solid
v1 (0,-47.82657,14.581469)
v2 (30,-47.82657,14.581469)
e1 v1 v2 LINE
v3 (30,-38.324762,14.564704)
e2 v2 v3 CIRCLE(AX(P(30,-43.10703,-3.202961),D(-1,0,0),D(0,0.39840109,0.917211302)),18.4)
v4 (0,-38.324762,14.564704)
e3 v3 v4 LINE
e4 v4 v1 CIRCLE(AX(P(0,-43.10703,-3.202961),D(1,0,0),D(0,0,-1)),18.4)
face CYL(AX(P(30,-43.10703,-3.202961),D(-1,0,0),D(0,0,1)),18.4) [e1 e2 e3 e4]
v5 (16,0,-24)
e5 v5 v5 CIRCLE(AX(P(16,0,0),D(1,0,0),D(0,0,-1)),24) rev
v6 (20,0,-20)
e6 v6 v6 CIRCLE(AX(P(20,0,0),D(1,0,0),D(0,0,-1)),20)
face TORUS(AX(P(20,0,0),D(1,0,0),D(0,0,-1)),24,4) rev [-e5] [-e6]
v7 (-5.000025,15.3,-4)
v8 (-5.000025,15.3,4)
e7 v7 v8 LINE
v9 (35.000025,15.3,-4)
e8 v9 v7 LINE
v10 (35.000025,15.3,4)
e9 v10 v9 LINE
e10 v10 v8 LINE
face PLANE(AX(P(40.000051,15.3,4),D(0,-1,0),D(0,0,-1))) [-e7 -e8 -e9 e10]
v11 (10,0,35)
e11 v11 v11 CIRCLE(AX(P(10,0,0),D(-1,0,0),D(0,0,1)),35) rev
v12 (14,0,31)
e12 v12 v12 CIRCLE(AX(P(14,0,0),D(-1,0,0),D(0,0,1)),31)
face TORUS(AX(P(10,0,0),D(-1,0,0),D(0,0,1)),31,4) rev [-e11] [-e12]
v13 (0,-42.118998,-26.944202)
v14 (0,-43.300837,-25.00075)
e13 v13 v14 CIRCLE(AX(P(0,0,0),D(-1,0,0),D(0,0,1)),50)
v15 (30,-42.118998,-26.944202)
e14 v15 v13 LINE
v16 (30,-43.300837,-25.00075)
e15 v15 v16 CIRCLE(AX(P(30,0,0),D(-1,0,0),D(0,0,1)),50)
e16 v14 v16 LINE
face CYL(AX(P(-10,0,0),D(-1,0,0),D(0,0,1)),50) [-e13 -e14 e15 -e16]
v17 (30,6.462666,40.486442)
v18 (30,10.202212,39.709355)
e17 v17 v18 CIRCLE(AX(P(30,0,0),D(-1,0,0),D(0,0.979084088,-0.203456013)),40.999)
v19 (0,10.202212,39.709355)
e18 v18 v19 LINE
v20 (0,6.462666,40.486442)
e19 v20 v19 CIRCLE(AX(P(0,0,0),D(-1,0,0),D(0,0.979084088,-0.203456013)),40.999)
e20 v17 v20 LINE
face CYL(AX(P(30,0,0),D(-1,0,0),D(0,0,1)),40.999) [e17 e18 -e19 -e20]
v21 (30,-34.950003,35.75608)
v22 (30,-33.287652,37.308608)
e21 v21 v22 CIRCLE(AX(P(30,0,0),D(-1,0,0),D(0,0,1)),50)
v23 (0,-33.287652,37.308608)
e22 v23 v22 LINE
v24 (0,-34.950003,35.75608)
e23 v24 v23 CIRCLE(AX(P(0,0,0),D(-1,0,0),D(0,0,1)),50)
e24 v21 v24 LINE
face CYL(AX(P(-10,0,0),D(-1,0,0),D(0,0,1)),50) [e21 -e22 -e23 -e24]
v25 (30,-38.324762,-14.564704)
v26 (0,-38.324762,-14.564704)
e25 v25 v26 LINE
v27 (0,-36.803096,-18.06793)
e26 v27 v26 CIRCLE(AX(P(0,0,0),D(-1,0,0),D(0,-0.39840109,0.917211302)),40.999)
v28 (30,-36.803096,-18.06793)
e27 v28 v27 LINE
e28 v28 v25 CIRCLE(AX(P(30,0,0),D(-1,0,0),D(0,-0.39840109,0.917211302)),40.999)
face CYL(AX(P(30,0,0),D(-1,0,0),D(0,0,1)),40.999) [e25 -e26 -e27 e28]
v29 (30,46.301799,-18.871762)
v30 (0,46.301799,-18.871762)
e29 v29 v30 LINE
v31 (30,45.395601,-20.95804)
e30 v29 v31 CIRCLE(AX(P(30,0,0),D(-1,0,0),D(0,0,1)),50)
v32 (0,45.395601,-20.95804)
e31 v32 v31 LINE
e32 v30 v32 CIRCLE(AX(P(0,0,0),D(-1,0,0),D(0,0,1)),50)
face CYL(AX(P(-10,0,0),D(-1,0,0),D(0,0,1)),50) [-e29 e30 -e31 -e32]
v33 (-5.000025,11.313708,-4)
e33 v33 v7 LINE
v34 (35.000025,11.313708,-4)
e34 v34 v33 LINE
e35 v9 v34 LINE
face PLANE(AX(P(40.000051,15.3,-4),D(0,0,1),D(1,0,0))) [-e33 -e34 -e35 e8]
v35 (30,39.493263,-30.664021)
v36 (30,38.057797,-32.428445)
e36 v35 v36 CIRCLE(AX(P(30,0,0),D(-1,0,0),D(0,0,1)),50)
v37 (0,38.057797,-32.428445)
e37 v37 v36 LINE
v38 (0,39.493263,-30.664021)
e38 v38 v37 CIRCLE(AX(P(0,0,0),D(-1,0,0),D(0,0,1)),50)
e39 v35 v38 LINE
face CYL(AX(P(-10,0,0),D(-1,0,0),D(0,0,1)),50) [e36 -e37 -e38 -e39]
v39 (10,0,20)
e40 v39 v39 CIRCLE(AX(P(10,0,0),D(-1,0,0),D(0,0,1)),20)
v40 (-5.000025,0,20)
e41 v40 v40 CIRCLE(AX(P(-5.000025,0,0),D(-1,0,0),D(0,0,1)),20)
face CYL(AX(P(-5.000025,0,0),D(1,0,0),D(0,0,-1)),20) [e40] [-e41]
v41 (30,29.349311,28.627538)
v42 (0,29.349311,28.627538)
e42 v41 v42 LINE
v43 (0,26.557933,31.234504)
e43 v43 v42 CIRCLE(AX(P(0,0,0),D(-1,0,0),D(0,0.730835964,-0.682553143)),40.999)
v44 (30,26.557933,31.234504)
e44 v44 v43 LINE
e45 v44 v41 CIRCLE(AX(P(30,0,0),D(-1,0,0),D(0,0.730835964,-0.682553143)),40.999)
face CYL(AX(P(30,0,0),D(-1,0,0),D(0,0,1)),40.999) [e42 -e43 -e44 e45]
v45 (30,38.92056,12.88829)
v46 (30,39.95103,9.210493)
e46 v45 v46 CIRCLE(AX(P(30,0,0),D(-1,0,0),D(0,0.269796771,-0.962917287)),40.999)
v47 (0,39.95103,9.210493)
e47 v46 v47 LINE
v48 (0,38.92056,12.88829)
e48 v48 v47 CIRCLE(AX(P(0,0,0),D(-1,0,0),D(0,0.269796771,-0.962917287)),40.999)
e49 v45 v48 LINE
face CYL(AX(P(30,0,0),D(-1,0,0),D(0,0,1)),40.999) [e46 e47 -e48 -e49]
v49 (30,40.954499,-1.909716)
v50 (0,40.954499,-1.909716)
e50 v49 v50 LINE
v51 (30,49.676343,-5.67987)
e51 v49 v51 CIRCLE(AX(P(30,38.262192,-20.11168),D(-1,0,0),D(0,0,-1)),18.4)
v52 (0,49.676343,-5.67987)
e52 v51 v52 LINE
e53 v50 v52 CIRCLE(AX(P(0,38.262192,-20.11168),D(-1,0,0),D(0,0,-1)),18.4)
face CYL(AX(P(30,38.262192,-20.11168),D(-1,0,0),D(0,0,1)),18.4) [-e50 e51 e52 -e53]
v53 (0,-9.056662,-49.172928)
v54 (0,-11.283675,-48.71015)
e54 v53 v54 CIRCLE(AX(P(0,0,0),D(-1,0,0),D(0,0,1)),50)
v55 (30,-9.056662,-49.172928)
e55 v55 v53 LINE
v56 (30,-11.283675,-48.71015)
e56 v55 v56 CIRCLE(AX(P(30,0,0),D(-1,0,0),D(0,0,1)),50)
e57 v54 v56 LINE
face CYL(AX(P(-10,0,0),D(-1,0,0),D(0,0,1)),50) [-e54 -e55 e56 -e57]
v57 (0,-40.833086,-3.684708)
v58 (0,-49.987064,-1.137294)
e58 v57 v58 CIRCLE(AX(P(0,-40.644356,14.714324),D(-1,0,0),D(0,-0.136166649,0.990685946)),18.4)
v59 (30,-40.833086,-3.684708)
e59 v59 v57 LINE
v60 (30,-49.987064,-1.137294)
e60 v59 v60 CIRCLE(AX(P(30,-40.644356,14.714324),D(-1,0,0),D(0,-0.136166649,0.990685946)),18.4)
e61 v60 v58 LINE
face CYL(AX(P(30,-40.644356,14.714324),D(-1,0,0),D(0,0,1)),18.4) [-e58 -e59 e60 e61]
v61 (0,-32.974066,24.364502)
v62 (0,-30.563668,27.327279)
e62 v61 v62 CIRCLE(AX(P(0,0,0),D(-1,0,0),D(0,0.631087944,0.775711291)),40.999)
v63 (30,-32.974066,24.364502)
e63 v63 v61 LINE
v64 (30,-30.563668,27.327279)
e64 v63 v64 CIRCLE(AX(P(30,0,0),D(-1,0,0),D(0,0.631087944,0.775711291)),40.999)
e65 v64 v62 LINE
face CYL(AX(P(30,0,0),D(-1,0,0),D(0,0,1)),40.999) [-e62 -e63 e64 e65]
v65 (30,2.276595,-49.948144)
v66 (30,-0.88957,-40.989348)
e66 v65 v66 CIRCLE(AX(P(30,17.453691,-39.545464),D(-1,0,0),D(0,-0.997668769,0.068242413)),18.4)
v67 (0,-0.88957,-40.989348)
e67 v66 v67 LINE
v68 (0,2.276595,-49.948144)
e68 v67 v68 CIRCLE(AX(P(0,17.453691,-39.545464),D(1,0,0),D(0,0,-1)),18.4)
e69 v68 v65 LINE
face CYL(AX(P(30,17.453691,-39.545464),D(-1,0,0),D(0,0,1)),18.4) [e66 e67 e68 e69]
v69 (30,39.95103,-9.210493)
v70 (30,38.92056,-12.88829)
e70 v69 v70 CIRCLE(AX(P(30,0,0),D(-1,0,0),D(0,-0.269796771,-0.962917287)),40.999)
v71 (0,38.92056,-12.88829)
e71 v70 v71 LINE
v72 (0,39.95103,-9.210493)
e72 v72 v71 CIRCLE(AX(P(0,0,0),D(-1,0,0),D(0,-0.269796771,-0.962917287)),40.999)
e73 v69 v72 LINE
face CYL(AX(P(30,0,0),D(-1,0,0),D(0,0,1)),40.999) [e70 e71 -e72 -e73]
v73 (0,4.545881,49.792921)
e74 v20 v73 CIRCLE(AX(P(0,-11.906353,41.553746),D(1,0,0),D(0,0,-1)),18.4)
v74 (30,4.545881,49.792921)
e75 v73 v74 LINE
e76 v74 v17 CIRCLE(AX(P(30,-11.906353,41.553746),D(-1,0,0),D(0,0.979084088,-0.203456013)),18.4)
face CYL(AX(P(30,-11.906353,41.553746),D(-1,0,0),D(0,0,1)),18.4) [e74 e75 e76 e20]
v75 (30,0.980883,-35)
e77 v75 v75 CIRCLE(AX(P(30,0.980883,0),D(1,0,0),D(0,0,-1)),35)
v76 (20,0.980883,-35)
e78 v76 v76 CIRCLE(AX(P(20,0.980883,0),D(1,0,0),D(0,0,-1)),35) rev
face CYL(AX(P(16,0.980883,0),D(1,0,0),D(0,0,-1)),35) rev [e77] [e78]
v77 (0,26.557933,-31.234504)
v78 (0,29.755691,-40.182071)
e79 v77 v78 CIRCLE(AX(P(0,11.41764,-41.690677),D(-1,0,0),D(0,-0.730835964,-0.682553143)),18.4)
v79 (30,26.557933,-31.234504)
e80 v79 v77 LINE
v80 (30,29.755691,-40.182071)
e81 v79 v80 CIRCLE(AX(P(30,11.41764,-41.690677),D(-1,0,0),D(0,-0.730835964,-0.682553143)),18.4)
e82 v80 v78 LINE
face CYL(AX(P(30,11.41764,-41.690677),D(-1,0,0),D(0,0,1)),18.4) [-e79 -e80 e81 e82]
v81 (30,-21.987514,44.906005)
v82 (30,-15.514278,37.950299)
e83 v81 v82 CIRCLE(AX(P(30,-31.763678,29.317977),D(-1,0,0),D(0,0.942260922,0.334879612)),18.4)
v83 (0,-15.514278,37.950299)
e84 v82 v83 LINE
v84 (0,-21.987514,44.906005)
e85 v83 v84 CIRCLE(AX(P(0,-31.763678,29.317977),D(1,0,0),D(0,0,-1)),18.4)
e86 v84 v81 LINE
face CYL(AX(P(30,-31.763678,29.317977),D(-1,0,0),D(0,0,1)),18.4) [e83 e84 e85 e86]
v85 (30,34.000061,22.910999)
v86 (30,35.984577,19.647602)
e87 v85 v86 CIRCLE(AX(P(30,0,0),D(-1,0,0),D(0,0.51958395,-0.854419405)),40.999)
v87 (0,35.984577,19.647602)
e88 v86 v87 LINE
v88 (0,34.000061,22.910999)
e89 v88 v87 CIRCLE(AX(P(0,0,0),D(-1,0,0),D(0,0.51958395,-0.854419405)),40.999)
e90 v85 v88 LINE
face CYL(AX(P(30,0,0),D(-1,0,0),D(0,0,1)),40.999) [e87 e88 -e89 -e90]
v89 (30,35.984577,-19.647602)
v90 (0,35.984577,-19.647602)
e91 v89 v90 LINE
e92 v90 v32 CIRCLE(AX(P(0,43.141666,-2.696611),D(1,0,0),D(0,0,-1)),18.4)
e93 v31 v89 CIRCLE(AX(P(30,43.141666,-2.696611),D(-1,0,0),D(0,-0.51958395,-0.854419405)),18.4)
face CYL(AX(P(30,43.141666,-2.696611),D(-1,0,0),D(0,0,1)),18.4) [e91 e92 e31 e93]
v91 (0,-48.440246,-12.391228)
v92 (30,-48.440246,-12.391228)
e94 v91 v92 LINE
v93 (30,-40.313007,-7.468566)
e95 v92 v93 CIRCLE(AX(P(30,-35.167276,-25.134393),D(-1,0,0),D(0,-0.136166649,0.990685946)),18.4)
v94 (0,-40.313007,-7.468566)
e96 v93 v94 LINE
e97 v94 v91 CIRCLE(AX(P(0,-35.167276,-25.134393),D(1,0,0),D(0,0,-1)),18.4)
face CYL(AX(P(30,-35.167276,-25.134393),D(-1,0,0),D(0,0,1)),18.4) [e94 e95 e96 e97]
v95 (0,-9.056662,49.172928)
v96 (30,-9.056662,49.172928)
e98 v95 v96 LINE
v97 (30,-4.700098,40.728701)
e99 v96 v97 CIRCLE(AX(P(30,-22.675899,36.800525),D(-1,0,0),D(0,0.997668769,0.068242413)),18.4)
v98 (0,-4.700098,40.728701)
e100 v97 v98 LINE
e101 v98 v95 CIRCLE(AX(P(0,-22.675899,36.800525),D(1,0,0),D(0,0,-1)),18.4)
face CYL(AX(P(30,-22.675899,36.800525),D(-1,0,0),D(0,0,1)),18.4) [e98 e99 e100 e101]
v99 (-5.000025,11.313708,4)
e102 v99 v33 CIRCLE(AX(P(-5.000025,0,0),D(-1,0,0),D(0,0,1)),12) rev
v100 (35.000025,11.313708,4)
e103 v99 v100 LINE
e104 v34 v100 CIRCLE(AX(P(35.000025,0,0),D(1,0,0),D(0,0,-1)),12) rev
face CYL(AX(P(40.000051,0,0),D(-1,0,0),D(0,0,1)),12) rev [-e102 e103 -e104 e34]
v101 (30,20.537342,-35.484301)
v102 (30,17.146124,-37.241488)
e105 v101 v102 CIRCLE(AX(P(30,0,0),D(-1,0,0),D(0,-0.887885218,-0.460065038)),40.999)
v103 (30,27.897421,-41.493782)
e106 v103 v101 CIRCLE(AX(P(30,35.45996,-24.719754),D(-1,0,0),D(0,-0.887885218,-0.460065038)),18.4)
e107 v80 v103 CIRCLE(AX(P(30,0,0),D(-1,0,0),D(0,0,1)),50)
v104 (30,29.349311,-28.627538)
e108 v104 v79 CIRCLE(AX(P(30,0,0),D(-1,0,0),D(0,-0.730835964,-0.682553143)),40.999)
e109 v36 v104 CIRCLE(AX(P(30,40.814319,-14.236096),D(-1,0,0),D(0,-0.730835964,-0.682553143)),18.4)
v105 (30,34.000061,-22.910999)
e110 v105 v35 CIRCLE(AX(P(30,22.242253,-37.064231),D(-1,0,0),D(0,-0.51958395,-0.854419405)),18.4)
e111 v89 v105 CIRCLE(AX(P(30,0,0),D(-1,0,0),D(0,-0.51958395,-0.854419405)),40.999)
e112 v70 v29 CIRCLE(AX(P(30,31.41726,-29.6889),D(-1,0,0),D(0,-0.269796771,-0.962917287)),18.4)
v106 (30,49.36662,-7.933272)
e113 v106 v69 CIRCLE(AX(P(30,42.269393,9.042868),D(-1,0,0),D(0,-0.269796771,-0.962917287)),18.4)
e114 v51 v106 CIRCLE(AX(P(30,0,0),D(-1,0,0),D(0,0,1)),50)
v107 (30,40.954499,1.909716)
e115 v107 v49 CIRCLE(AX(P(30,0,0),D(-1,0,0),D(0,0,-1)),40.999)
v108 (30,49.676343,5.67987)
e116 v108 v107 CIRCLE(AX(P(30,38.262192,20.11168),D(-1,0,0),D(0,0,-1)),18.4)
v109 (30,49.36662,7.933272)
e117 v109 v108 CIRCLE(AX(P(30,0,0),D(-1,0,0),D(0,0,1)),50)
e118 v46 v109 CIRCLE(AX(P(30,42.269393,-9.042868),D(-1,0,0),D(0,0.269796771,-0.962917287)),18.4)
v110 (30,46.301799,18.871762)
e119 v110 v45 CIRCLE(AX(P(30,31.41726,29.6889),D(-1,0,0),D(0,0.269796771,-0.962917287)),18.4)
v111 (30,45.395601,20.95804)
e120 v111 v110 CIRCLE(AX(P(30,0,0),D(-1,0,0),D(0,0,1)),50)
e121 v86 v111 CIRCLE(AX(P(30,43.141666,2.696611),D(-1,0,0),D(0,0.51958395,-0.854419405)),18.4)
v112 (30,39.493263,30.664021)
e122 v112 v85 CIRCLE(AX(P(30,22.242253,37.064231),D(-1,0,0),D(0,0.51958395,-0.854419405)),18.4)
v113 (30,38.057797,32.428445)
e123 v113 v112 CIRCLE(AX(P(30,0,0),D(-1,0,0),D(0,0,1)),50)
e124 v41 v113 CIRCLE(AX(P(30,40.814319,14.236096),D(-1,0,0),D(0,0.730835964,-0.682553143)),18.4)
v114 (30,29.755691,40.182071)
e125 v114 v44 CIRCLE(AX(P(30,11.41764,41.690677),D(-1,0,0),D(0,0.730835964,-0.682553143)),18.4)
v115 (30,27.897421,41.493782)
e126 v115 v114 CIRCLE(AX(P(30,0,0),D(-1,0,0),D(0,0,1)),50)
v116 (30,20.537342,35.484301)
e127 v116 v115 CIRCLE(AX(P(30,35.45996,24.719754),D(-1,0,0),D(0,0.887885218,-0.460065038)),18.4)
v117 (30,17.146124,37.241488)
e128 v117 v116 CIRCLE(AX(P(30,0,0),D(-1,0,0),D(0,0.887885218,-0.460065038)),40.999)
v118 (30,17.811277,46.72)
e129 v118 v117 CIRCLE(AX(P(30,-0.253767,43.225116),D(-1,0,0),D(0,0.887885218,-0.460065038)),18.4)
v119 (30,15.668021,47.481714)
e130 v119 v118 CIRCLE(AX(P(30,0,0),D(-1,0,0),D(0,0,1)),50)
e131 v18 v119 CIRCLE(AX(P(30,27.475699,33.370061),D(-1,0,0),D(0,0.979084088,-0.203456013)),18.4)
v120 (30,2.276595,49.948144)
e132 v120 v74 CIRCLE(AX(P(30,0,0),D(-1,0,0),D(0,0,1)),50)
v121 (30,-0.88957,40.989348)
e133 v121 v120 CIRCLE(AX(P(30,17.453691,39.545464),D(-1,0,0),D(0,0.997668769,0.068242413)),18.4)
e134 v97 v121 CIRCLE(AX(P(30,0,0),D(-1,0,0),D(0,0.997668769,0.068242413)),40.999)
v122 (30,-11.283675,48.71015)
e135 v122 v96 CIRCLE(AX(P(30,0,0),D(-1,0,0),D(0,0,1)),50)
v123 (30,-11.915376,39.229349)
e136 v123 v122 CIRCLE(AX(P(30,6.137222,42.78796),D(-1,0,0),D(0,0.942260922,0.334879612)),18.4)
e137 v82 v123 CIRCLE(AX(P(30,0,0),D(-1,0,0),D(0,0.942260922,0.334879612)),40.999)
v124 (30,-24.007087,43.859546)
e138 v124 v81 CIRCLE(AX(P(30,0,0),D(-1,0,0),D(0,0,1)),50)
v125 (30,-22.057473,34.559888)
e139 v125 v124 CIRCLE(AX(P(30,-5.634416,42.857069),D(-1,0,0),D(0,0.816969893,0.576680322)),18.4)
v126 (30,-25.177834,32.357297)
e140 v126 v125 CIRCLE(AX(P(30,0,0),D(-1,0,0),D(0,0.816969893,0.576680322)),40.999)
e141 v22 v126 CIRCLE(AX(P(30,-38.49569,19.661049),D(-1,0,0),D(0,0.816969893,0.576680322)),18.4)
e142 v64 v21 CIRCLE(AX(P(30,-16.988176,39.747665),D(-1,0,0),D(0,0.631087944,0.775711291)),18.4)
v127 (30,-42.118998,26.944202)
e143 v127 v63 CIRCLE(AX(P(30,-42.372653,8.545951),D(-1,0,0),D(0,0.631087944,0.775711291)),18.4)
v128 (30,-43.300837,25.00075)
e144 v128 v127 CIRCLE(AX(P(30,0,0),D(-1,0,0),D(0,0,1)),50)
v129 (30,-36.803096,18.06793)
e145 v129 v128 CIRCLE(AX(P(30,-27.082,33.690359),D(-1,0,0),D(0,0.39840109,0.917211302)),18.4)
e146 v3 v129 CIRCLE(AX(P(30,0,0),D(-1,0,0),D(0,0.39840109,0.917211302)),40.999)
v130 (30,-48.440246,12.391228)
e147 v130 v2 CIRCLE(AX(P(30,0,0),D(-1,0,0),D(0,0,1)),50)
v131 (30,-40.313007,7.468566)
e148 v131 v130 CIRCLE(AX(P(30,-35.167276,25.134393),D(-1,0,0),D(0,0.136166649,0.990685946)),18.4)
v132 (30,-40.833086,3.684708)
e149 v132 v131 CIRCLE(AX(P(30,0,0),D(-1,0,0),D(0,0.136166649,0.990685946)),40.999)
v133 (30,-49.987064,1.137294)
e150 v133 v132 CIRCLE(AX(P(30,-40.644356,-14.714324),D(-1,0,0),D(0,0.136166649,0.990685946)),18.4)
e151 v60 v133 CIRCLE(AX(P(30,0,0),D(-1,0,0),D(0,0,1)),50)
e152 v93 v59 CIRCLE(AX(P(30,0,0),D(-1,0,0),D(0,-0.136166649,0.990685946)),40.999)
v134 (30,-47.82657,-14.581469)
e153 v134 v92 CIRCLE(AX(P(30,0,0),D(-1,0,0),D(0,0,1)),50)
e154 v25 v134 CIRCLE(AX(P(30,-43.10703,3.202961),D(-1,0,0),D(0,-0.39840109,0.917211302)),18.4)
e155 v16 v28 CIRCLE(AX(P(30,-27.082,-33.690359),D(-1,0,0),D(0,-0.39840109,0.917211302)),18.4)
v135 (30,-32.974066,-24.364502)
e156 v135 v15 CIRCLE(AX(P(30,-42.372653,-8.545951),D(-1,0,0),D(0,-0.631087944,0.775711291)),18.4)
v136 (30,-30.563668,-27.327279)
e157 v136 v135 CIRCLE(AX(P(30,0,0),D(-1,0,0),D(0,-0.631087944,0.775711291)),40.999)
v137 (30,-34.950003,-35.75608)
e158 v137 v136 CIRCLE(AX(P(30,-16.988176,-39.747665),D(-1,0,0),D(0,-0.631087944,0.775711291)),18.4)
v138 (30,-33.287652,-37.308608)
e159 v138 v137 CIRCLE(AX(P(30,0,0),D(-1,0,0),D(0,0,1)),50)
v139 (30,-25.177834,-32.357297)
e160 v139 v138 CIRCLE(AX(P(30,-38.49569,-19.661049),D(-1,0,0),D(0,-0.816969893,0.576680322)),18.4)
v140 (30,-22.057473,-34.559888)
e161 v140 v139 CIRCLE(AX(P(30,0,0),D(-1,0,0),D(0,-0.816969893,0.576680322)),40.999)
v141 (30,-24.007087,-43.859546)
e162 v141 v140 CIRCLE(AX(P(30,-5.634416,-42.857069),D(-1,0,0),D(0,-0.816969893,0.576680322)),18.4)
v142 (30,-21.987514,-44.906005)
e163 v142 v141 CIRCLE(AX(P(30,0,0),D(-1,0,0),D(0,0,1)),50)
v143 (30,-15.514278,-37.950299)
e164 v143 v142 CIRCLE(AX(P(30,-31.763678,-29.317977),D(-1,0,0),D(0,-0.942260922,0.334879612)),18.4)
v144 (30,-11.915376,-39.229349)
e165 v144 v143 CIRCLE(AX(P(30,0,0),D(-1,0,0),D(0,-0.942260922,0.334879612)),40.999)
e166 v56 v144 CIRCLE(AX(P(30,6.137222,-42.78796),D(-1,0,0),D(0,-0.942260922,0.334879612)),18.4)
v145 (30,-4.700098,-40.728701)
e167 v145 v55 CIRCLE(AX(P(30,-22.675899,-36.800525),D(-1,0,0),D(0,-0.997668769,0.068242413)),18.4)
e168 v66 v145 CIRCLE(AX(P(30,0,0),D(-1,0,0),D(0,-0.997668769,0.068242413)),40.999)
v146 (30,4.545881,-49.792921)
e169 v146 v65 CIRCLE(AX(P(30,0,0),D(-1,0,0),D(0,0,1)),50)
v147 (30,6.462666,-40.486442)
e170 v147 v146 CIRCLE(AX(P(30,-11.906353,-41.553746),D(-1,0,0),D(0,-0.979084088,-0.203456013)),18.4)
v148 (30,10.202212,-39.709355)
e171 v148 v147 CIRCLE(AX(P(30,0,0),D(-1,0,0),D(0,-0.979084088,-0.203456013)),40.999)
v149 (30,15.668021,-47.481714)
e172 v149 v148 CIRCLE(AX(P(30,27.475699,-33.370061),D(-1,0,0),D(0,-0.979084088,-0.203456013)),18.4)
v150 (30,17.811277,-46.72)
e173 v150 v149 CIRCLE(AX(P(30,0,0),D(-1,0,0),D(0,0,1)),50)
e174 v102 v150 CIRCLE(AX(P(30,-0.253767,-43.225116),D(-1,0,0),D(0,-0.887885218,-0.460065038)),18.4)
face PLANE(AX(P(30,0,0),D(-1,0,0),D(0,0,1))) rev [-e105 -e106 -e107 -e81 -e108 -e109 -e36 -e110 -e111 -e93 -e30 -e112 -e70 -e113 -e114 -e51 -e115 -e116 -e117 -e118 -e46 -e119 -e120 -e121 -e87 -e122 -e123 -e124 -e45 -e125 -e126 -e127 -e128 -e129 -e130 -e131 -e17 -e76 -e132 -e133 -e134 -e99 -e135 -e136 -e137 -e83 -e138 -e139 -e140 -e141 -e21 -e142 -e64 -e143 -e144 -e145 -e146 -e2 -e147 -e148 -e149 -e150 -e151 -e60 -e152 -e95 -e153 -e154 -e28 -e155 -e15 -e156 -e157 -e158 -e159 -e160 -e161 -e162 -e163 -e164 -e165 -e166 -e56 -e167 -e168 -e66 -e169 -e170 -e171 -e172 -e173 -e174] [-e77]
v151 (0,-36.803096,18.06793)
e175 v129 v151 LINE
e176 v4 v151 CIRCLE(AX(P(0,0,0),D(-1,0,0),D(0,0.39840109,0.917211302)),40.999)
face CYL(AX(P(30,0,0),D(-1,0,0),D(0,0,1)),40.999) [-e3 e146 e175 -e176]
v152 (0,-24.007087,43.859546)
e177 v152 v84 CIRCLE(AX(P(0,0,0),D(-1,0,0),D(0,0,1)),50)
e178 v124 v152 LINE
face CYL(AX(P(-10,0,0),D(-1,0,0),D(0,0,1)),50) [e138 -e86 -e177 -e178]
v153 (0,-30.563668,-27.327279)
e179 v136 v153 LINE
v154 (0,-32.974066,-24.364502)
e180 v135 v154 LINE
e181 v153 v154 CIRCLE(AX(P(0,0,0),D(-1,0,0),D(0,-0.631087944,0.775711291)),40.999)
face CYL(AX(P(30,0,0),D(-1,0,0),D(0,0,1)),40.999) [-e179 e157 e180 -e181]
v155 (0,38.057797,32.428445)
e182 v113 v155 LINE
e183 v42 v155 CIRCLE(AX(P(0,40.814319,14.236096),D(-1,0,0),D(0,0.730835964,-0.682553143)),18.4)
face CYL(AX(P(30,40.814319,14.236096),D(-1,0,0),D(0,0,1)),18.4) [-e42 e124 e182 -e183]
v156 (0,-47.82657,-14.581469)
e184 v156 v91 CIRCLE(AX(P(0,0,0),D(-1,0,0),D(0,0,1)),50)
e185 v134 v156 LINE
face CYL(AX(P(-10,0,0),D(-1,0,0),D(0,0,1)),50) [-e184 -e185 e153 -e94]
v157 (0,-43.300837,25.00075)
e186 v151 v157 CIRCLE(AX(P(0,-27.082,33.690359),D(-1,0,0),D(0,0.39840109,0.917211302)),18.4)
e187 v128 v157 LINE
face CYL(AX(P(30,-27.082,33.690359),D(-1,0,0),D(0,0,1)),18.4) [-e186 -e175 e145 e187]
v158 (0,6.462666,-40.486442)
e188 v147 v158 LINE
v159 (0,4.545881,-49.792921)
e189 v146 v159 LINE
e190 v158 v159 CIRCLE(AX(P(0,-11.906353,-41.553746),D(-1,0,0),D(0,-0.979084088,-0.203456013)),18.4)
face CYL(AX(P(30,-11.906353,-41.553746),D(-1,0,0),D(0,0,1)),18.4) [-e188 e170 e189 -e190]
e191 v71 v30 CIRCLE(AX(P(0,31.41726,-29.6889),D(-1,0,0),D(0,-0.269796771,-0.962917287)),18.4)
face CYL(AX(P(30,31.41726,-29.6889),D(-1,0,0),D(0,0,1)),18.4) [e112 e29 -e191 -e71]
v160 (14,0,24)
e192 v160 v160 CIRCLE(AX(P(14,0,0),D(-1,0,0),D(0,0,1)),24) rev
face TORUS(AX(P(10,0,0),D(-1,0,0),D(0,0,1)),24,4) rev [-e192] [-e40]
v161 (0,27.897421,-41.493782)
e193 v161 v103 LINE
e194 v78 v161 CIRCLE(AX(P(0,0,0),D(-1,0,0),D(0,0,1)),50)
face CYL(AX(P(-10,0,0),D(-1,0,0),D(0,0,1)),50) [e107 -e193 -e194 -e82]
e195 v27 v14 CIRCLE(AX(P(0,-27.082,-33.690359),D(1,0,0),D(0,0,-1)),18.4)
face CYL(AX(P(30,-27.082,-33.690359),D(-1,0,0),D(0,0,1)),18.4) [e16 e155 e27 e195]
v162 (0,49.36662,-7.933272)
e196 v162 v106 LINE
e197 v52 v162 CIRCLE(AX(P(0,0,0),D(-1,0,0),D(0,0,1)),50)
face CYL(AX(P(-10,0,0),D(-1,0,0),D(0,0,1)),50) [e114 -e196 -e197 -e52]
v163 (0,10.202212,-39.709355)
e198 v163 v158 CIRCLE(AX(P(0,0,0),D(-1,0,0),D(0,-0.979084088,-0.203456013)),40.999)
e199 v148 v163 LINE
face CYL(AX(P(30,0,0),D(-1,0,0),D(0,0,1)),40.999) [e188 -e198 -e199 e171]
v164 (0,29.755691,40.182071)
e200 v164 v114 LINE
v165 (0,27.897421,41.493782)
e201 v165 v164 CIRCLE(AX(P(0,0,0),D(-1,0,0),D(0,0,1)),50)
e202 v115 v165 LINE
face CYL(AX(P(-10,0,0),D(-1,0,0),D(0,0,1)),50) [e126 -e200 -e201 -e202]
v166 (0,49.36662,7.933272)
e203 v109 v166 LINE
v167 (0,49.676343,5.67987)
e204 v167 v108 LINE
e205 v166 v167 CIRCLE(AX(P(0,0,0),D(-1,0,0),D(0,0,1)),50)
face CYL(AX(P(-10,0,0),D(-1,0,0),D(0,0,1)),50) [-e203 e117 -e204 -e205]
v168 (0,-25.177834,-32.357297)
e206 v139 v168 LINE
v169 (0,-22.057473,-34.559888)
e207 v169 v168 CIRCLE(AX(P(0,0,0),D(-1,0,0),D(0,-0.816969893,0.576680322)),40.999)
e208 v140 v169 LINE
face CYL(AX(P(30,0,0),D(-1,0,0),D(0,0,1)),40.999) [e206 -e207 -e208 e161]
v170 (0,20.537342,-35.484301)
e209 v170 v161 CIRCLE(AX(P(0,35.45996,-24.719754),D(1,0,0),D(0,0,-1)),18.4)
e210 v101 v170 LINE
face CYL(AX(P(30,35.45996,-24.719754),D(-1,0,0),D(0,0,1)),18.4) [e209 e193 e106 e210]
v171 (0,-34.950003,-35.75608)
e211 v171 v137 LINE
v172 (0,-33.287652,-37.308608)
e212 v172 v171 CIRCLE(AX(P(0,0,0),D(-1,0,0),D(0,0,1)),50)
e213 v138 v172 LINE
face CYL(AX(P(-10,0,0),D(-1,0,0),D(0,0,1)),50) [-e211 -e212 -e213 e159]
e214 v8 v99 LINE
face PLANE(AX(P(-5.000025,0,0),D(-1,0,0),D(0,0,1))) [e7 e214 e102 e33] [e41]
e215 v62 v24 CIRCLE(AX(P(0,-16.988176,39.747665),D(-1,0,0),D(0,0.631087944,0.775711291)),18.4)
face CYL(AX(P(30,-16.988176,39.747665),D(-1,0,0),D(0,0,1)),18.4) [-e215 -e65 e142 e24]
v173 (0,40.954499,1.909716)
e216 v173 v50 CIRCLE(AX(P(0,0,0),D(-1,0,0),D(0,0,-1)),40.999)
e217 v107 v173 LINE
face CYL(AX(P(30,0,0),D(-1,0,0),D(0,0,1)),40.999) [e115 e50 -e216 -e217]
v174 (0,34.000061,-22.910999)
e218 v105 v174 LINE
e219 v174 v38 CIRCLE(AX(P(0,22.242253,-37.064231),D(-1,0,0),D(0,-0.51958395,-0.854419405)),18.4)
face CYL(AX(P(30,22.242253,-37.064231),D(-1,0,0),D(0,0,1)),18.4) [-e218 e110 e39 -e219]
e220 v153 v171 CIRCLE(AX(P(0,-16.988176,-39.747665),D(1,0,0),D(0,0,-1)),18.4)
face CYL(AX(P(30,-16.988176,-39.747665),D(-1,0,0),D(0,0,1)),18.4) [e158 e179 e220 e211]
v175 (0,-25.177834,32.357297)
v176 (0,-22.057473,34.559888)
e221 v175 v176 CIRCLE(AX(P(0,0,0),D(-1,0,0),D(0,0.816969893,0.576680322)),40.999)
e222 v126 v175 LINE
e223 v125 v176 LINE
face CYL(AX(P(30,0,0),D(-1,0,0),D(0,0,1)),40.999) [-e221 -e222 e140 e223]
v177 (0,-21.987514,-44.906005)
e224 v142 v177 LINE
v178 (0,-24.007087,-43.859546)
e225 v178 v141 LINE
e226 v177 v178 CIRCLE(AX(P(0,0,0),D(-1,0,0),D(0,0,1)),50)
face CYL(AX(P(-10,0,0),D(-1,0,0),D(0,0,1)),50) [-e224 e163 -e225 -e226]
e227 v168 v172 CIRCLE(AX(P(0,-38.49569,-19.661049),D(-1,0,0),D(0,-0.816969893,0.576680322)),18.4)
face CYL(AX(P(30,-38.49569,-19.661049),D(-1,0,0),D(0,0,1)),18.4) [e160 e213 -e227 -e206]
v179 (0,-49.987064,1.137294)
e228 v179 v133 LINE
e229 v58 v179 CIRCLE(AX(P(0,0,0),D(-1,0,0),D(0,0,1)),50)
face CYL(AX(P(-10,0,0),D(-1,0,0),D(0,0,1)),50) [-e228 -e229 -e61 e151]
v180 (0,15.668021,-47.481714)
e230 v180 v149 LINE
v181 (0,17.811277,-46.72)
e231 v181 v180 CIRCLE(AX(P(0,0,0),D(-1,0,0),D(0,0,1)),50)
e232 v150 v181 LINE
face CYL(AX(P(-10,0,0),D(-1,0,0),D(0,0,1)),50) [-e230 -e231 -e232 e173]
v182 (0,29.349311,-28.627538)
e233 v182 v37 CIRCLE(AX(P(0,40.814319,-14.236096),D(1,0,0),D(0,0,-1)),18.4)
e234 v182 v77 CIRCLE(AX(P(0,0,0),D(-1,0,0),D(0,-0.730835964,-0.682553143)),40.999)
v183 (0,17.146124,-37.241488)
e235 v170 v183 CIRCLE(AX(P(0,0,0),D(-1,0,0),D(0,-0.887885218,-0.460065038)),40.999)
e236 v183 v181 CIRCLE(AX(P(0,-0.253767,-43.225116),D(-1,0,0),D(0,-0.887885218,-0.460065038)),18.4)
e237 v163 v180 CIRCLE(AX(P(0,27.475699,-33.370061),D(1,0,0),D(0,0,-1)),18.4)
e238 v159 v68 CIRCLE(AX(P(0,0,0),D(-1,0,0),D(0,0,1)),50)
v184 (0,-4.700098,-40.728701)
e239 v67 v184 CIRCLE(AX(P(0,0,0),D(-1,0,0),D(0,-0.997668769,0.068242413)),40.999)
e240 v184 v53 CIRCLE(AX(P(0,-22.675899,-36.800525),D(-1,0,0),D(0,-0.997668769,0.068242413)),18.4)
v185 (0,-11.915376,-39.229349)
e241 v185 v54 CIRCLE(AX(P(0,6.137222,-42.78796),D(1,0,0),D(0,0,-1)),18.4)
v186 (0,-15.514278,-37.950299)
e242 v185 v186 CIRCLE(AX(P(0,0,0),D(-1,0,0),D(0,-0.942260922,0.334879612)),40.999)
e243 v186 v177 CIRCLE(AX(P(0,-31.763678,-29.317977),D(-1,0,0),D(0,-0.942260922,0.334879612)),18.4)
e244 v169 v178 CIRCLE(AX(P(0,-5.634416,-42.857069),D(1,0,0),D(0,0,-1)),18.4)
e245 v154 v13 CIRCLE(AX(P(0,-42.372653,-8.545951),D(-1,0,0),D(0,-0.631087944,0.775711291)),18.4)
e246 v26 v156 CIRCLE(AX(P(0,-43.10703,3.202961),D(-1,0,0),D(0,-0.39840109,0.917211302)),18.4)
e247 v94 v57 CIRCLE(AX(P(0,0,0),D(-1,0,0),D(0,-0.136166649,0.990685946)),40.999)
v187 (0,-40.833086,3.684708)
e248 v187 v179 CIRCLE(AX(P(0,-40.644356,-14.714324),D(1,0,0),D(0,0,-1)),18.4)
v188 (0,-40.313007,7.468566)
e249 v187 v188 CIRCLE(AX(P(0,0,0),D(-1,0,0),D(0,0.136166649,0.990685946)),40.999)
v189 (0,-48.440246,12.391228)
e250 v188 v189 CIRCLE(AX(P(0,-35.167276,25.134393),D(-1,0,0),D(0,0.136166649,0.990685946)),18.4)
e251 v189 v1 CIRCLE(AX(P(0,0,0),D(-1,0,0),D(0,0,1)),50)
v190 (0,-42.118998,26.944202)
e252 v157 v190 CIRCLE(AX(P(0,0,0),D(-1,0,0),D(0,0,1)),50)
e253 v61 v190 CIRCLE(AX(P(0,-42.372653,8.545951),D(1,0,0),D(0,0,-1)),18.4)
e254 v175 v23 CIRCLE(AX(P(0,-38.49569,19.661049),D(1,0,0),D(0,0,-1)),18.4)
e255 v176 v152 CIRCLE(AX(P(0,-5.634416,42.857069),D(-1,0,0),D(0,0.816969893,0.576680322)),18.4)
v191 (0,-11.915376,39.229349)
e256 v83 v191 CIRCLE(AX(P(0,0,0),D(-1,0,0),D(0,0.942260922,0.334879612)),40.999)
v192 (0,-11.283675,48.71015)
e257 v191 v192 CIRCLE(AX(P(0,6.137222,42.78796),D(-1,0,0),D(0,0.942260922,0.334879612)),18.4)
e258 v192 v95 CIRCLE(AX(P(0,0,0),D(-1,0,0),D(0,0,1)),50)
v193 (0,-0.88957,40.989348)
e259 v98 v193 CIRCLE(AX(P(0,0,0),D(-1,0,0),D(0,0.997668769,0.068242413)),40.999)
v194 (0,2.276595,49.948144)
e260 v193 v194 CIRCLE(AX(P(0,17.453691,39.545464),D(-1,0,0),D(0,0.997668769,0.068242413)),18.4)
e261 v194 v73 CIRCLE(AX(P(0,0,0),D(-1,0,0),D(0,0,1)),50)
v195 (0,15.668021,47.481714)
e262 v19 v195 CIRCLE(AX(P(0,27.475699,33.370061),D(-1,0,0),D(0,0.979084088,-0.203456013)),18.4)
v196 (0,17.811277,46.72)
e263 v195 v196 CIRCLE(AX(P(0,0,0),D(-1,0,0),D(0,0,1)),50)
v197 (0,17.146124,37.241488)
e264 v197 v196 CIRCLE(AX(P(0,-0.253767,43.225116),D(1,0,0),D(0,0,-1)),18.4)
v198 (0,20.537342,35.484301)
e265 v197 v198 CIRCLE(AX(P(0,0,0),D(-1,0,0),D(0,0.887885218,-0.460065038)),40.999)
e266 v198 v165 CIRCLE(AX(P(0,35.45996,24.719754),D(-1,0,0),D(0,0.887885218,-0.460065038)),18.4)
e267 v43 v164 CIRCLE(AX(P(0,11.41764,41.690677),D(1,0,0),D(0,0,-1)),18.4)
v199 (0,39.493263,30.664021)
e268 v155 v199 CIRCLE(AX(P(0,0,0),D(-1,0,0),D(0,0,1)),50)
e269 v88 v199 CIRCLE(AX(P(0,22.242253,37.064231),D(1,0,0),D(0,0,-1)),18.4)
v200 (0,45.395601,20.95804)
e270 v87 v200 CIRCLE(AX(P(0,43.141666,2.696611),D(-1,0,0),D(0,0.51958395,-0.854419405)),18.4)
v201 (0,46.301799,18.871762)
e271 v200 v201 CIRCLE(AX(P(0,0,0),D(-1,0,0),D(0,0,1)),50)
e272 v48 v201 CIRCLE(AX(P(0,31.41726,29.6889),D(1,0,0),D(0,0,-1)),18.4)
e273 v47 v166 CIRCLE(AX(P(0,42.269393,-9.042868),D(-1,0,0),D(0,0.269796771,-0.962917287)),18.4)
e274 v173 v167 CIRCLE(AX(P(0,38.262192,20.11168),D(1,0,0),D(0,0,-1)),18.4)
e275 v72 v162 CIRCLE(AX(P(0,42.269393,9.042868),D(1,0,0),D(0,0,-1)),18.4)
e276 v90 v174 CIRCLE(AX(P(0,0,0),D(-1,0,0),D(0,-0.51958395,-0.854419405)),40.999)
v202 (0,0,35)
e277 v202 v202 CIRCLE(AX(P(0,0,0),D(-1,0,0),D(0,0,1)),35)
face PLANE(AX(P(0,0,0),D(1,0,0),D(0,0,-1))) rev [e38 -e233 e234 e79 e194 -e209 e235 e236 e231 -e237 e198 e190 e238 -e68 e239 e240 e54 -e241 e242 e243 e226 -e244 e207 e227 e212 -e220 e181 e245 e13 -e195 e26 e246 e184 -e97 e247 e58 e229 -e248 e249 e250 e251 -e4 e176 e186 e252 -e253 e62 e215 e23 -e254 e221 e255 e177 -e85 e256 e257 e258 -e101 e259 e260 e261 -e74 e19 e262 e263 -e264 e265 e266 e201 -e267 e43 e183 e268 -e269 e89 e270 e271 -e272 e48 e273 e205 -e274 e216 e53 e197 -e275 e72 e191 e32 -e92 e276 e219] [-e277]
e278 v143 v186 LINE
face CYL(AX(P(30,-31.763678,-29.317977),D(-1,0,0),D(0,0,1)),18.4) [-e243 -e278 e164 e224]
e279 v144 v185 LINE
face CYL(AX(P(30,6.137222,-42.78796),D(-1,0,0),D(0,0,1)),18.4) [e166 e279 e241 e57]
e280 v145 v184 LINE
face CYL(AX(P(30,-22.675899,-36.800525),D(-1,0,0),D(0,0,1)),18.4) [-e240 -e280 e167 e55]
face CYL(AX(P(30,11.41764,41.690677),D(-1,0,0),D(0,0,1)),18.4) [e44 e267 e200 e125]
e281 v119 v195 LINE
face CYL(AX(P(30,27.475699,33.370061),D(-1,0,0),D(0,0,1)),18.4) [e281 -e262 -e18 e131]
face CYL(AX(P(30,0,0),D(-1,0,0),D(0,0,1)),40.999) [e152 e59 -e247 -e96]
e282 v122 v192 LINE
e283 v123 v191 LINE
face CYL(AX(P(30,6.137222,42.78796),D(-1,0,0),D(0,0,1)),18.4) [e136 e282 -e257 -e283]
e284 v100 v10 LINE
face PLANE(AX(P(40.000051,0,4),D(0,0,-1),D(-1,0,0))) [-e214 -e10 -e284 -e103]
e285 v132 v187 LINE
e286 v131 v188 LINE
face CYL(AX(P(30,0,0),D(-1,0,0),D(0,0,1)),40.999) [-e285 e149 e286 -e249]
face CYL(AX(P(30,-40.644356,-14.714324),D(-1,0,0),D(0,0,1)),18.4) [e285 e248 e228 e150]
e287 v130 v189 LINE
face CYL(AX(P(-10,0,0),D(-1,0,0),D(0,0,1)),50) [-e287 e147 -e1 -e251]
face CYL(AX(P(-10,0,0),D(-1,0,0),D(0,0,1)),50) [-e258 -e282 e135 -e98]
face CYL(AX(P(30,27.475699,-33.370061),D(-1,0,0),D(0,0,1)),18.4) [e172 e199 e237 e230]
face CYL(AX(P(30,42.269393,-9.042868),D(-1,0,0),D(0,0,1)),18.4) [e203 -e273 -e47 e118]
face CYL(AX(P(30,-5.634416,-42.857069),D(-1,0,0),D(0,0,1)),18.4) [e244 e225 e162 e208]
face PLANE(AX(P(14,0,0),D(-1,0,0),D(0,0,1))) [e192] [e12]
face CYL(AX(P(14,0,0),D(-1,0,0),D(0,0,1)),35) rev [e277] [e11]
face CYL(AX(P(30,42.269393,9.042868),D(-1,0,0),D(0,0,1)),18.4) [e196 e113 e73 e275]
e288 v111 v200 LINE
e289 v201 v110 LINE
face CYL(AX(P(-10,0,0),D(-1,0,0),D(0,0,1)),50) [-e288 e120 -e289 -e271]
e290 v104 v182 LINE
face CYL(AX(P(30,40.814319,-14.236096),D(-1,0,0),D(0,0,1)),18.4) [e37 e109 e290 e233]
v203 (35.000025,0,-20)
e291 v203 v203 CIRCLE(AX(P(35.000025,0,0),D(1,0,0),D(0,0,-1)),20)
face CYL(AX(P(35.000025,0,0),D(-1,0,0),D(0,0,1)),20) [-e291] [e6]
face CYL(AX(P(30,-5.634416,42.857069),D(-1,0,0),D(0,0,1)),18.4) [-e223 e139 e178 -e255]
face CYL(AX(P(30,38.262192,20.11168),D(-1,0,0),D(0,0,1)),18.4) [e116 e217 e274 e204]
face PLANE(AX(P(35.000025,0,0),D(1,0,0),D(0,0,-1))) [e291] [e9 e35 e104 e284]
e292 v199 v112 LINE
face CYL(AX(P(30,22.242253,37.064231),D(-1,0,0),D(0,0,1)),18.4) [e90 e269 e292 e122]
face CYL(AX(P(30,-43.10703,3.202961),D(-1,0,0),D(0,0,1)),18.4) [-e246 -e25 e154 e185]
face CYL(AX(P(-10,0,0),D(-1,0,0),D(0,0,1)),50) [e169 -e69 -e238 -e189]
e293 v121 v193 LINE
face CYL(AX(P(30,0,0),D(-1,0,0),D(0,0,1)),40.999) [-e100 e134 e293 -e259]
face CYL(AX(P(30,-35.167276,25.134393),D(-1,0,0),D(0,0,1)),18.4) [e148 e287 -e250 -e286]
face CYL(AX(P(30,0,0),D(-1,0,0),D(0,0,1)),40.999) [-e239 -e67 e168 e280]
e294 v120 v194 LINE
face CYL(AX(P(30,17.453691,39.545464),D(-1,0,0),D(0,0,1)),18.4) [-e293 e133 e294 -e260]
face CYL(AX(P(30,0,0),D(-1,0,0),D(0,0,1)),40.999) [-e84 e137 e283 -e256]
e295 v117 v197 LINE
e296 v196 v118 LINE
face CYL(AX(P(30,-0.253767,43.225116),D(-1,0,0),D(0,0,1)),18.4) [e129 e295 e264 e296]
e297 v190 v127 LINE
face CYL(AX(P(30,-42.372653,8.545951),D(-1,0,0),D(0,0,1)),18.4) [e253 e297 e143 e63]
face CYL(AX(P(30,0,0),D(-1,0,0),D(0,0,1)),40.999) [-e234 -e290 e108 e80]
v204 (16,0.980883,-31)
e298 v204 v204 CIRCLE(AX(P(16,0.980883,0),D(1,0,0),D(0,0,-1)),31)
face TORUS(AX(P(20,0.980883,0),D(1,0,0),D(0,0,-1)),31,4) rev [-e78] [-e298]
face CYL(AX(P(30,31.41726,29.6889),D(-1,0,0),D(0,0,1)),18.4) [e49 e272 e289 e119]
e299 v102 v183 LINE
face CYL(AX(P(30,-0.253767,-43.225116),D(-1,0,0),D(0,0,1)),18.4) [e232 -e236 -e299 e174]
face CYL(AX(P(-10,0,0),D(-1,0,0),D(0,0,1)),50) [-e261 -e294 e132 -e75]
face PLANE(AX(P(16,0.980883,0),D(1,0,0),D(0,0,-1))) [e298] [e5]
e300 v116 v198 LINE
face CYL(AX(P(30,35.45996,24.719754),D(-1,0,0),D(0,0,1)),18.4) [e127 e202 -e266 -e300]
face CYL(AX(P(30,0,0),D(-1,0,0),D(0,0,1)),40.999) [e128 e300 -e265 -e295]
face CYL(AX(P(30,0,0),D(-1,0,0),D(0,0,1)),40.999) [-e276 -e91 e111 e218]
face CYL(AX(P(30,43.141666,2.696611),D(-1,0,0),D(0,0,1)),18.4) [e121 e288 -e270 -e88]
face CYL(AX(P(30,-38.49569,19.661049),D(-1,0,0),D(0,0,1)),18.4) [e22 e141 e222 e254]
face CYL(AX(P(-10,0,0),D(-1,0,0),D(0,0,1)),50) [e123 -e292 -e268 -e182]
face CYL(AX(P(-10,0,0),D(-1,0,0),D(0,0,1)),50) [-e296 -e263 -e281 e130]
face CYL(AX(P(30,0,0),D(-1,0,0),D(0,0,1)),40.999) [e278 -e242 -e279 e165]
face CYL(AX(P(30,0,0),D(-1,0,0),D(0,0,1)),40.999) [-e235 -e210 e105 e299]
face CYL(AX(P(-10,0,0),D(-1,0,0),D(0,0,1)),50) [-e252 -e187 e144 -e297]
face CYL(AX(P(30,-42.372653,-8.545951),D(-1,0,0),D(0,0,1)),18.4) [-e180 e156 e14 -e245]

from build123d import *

# Parameters (mm, degrees)
BASPROSKE_W        = 30
BASPROSKE_H        = 50
TOOTHCUT_DEPTH     = 77.811457479
TEETHCUTS_COUNT    = 23
TEETHCUTS_ANGLE    = 344.347826087
HUBNEABOTSKE_R     = 20
HUBNEARBOTH_DEPTH  = 5.0000254
HUBFAR_START       = 5.0000254
HUBFARSKE_R        = 20
HUBFAR_DEPTH       = 5.0000254
BORSKE_R           = 12
BORE_DEPTH         = 40.0000508
KEYSKE_W           = 8
KEYSKE_H           = 15.3
KEYWAY_DEPTH       = 40.0000508
SKETCH1_R          = 35
SKETCH1_R_2        = 20
CUT_EXTRUDE1_DEPTH = 14
FILLET1_R          = 4
CUT_EXTRUDE2_START = -14
SKETCH2_R          = 35
SKETCH2_R_2        = 20
CUT_EXTRUDE2_DEPTH = 14
FILLET2_R          = 4


with BuildPart() as part:
    # BasProSke → Base-Revolve (revolve)
    with BuildSketch(Plane(origin=(0, 0, 0), x_dir=(1, 0, 0), z_dir=(0, 1, 0))):
        with Locations((15, 25)):
            Rectangle(BASPROSKE_W, BASPROSKE_H)
    revolve(axis=Axis((-10, 0, 0), (1, 0, 0)))

    # TooCutSke → ToothCut (cut, through all)
    with BuildSketch(Plane(origin=(0, 0, 0), x_dir=(0, 0, -1), z_dir=(1, 0, 0))):
        with BuildLine():
            ThreePointArc((1.90971626, 40.954498957), (0, 40.999), (-1.90971626, 40.954498957))
            ThreePointArc((-1.90971626, 40.954498957), (-3.228022445, 45.57670564), (-5.698439072, 49.699783071))
            ThreePointArc((-5.698439072, 49.699783071), (0, 50.0254), (5.698439072, 49.699783071))
            ThreePointArc((5.698439072, 49.699783071), (3.228022445, 45.57670564), (1.90971626, 40.954498957))
        make_face()
    toothcut = extrude(amount=TOOTHCUT_DEPTH, mode=Mode.SUBTRACT)

    # TeethCuts: ToothCut ×23 about axis
    teethcuts_axis = Axis((-10, 0, 0), (1, 0, 0))
    for i in range(1, TEETHCUTS_COUNT):
        add(toothcut.rotate(teethcuts_axis, i * TEETHCUTS_ANGLE / (TEETHCUTS_COUNT - 1)), mode=Mode.SUBTRACT)

    # HubNeaBotSke → HubNearBoth (add)
    with BuildSketch(Plane.ZY):
        Circle(HUBNEABOTSKE_R)
    extrude(amount=HUBNEARBOTH_DEPTH)

    # HubFarSke → HubFar (add)
    with BuildSketch(Plane(origin=(30, 0, 0), x_dir=(0, 0, -1), z_dir=(1, 0, 0)).offset(HUBFAR_START)):
        Circle(HUBFARSKE_R)
    extrude(amount=-HUBFAR_DEPTH)

    # BorSke → Bore (cut, symmetric)
    with BuildSketch(Plane(origin=(0, 0, 0), x_dir=(0, 0, -1), z_dir=(1, 0, 0))):
        Circle(BORSKE_R)
    extrude(amount=BORE_DEPTH, both=True, mode=Mode.SUBTRACT)

    # KeySke → Keyway (cut, symmetric)
    with BuildSketch(Plane(origin=(0, 0, 0), x_dir=(0, 0, -1), z_dir=(1, 0, 0))):
        with Locations((0, 7.65)):
            Rectangle(KEYSKE_W, KEYSKE_H)
    extrude(amount=KEYWAY_DEPTH, both=True, mode=Mode.SUBTRACT)

    # Sketch1 → Cut-Extrude1 (cut)
    with BuildSketch(Plane(origin=(30, 0, 0), x_dir=(0, 0, -1), z_dir=(1, 0, 0))):
        with Locations((0, 0.98088297)):
            Circle(SKETCH1_R)
        Circle(SKETCH1_R_2, mode=Mode.SUBTRACT)
    extrude(amount=-CUT_EXTRUDE1_DEPTH, mode=Mode.SUBTRACT)

    # Fillet1
    fillet1_edges = [part.edges().sort_by_distance(p)[0] for p in [
        (16, 0, 20),
        (16, 0.98088297, 35),
    ]]
    fillet(fillet1_edges, radius=FILLET1_R)

    # Sketch2 → Cut-Extrude2 (cut)
    with BuildSketch(Plane.ZY.offset(CUT_EXTRUDE2_START)):
        Circle(SKETCH2_R)
        Circle(SKETCH2_R_2, mode=Mode.SUBTRACT)
    extrude(amount=CUT_EXTRUDE2_DEPTH, mode=Mode.SUBTRACT)

    # Fillet2
    fillet2_edges = [part.edges().sort_by_distance(p)[0] for p in [
        (14, 0, -20),
        (14, 0, -35),
    ]]
    fillet(fillet2_edges, radius=FILLET2_R)


solid = part.part
